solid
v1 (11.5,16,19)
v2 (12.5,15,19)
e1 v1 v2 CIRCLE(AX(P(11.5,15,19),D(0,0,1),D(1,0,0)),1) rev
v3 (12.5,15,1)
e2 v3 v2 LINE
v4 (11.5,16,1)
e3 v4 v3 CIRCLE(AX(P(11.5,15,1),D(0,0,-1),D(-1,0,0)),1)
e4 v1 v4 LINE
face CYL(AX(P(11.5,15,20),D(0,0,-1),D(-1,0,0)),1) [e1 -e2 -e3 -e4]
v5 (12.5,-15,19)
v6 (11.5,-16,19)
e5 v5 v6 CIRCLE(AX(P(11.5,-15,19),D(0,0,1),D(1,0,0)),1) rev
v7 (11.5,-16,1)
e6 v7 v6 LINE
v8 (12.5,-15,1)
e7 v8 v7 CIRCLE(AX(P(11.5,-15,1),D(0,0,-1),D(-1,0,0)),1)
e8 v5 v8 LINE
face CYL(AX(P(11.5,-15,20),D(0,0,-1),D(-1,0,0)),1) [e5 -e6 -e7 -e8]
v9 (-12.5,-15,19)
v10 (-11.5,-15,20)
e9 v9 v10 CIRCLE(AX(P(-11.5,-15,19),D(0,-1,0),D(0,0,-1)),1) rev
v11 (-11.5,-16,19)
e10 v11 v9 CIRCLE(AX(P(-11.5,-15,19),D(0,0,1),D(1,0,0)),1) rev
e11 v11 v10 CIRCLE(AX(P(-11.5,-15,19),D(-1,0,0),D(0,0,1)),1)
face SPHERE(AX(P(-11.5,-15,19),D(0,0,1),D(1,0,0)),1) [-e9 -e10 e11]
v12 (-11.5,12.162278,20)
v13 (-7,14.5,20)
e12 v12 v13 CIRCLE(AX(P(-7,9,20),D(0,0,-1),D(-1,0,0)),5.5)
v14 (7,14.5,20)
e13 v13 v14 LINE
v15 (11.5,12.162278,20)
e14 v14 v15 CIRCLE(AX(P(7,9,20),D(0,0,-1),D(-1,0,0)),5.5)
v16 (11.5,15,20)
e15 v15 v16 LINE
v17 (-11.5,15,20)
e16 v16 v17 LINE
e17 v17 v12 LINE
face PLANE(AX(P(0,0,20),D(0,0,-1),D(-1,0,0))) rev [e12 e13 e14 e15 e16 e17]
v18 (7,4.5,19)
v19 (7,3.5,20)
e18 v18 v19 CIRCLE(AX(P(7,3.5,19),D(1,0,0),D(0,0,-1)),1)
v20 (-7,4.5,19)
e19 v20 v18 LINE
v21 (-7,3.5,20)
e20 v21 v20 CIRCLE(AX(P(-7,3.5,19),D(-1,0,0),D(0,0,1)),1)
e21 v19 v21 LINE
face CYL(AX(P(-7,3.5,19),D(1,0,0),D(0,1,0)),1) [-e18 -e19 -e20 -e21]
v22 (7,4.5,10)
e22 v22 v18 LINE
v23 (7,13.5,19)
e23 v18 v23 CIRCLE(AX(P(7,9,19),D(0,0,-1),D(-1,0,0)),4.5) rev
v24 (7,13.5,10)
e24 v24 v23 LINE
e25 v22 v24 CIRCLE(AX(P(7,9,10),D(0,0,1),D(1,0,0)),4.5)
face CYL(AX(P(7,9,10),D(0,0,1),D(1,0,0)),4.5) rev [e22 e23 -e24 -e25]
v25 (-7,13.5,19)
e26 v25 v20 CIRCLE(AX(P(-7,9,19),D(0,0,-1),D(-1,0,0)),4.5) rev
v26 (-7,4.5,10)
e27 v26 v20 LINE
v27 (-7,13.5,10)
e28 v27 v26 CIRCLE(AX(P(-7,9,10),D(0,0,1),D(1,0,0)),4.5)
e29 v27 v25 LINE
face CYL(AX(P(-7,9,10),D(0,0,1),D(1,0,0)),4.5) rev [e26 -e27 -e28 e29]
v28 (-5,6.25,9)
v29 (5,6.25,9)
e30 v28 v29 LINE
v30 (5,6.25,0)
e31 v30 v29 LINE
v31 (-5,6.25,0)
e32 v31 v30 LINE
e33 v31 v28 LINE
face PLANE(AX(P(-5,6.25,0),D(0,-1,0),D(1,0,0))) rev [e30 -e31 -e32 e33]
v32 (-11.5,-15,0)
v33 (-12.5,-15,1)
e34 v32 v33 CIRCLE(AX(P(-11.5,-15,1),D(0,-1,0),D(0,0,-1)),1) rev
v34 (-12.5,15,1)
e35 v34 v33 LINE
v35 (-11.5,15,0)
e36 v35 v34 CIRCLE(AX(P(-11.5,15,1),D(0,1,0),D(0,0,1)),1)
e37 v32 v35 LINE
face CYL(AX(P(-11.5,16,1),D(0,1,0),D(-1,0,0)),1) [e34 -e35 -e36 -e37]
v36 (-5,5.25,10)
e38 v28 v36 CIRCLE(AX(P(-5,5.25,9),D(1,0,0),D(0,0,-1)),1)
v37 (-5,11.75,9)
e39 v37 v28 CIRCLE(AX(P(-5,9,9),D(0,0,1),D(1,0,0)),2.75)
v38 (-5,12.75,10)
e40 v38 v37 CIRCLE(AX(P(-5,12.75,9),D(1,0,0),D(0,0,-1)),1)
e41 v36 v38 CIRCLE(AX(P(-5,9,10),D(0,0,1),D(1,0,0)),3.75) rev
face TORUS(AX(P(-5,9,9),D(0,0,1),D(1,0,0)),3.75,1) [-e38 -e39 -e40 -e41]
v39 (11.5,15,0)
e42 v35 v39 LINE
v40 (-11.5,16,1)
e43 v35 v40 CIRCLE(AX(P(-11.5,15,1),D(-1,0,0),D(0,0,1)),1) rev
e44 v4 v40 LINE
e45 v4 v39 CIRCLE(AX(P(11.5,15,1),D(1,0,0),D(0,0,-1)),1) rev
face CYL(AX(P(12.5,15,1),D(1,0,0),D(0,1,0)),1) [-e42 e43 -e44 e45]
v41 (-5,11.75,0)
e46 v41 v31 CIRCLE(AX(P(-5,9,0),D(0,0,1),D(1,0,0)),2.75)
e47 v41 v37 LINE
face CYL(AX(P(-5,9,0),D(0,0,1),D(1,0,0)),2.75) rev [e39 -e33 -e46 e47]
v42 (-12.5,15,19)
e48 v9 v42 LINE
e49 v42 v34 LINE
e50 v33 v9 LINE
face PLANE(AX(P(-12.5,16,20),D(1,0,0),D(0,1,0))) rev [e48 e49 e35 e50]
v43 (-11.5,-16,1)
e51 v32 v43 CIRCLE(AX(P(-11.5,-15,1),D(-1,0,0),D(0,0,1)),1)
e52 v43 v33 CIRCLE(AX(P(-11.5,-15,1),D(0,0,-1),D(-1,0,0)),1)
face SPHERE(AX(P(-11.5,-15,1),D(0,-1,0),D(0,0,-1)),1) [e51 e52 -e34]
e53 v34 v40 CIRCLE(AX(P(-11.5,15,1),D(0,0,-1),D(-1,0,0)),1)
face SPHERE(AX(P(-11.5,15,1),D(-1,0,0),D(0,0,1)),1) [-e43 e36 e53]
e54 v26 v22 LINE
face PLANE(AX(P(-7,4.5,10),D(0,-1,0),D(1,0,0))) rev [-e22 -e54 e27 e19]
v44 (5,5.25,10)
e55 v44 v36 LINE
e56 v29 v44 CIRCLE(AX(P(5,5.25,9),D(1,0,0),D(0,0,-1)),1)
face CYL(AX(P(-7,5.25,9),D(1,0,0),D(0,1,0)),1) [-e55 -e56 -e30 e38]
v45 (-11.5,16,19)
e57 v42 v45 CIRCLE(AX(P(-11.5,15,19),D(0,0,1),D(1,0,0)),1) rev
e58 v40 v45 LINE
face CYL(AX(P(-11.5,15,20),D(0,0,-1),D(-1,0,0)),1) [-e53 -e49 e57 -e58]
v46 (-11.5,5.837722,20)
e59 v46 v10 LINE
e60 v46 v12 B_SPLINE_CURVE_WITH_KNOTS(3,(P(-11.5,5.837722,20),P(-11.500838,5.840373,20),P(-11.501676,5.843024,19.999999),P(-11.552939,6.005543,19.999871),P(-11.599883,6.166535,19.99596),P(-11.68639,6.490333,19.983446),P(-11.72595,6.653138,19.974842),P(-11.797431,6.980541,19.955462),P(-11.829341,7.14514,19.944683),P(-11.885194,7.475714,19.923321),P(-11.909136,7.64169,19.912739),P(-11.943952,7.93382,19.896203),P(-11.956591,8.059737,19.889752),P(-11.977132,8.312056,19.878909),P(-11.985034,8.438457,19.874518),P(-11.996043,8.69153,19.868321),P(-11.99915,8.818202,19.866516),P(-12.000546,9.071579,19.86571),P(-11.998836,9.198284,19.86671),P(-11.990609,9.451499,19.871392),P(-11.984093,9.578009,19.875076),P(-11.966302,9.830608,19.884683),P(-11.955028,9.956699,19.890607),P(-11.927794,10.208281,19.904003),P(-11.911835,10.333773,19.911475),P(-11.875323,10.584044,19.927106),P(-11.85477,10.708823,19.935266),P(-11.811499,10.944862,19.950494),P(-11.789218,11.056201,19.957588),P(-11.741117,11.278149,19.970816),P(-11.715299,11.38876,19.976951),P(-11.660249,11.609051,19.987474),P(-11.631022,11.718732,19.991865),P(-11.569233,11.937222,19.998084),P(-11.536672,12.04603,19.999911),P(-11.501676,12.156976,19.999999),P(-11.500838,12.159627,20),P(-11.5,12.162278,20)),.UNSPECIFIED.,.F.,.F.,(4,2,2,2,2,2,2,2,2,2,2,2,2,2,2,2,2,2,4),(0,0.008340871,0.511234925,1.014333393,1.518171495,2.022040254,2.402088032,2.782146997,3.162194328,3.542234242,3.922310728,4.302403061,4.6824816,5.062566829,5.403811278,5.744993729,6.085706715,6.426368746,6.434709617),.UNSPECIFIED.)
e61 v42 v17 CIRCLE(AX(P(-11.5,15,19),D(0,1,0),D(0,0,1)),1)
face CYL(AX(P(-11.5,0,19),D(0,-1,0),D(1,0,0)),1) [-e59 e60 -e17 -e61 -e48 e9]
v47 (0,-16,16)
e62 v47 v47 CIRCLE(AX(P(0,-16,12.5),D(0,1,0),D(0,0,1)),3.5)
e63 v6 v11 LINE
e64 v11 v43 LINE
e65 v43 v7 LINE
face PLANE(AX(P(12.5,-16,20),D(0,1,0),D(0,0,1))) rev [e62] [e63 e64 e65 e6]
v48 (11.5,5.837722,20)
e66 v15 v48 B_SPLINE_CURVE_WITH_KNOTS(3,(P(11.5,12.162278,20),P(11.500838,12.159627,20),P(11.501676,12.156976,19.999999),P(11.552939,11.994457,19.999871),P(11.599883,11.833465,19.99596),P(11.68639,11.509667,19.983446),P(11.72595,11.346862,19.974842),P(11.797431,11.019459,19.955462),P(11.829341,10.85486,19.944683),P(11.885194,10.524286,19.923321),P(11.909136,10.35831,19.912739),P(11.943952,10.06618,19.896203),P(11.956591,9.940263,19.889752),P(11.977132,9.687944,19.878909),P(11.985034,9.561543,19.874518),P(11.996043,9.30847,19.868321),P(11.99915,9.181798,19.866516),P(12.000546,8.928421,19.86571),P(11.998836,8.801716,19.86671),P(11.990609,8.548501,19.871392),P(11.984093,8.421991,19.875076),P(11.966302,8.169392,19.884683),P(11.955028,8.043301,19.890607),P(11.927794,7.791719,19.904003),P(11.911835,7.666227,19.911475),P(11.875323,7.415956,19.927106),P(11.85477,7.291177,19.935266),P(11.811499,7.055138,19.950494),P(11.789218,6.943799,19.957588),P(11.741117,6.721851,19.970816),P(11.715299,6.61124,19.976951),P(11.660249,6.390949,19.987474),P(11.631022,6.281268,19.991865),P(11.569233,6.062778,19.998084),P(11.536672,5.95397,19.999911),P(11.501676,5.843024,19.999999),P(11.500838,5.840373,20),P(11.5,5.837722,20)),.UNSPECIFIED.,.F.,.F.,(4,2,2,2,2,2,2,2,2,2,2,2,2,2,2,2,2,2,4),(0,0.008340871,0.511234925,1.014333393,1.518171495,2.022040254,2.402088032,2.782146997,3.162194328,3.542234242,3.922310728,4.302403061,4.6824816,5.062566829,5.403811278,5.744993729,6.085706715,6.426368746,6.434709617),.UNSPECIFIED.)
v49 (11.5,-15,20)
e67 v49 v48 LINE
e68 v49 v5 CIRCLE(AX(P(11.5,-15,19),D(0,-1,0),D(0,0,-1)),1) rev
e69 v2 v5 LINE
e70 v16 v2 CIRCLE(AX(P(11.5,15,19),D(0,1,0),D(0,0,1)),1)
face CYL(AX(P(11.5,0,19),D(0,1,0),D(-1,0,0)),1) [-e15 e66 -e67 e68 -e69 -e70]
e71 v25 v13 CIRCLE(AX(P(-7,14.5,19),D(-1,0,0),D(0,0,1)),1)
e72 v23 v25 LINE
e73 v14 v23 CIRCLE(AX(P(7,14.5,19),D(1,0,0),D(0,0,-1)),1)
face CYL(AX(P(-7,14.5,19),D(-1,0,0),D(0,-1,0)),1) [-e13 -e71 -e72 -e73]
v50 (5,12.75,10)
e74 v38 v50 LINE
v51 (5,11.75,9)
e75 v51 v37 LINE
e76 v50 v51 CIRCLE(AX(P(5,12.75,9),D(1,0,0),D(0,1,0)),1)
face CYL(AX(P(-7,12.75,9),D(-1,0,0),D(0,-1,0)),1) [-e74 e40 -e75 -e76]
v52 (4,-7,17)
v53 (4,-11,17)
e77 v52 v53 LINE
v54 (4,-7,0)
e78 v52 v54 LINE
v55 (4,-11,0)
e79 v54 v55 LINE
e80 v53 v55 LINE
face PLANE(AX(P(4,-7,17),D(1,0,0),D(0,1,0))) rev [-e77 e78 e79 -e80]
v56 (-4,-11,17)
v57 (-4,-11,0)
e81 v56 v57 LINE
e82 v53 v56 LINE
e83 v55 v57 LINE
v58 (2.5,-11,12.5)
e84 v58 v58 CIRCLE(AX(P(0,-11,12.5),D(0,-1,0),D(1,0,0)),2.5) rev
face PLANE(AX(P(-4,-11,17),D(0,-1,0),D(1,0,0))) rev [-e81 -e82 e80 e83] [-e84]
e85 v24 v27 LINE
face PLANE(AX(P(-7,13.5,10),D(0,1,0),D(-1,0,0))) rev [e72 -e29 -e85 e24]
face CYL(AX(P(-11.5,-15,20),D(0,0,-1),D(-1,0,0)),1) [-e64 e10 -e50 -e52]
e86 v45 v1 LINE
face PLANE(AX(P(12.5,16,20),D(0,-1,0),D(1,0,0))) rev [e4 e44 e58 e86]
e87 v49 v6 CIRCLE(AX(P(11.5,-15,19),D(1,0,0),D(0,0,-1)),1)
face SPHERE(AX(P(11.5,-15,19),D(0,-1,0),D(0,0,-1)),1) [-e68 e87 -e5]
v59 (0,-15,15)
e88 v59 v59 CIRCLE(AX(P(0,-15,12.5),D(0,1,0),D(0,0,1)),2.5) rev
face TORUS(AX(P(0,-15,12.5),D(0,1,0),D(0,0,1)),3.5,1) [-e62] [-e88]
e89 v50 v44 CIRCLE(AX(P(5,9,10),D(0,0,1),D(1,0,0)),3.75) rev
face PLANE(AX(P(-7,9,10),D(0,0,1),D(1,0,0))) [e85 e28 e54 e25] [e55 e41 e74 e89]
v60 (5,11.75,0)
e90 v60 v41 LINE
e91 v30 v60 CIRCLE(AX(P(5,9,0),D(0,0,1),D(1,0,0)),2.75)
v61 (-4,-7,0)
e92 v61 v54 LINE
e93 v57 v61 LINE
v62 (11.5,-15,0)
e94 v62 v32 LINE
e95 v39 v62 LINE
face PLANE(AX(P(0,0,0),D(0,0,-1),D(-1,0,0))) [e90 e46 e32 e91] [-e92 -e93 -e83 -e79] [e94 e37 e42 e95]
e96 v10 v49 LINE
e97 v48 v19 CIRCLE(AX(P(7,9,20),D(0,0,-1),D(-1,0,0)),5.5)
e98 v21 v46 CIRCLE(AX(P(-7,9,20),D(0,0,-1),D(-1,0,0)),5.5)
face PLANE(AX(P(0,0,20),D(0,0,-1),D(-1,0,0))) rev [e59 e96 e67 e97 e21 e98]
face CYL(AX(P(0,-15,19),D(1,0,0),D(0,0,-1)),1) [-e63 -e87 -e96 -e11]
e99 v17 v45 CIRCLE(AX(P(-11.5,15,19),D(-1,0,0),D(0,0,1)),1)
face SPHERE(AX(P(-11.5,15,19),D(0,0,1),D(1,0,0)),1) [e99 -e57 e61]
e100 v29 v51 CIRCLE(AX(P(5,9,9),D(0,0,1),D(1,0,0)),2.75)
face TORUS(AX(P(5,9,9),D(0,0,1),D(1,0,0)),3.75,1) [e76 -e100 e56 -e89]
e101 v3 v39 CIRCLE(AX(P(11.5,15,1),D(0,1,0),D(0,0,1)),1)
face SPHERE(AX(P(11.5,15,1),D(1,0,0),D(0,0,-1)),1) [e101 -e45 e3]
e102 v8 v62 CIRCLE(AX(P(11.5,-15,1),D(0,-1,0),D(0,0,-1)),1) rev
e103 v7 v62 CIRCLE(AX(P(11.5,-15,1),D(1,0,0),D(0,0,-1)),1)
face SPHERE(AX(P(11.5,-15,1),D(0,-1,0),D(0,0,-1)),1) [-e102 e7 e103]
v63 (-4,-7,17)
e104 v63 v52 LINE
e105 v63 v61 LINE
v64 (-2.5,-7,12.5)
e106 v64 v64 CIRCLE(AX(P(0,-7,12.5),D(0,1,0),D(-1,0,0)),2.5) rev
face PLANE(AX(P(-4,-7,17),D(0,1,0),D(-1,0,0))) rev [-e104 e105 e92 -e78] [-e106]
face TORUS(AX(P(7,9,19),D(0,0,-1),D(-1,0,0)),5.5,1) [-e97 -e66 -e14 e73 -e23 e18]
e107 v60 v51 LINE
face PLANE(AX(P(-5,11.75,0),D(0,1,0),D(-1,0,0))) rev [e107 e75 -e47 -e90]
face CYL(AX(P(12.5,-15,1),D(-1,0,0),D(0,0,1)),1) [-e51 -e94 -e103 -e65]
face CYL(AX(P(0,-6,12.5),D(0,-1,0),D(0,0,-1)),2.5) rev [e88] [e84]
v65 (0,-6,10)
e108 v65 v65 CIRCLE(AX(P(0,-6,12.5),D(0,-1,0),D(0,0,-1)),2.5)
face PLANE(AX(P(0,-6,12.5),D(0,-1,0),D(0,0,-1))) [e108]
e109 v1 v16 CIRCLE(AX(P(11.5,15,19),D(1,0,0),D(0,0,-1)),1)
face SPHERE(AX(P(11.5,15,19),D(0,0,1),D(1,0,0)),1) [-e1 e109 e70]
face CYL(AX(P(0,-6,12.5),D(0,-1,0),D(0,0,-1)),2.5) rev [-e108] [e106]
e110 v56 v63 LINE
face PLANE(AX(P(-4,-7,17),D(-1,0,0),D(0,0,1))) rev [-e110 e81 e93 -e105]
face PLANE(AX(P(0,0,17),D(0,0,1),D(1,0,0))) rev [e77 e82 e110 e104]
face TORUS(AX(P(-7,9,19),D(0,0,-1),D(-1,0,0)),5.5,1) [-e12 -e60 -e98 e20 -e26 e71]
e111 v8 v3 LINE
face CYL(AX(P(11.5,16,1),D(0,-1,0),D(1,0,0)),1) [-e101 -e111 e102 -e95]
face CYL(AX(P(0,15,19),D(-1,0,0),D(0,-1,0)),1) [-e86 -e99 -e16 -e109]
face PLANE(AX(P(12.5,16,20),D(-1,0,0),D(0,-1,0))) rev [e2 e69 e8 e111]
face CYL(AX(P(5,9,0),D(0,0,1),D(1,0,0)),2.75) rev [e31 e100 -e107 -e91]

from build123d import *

# Parameters (mm, degrees)
CROQUIS1_W              = 25
CROQUIS1_H              = 32
SALIENTE_EXTRUIR1_DEPTH = 20
CORTAR_EXTRUIR2_DEPTH   = 20
CORTAR_EXTRUIR3_DEPTH   = 10
CROQUIS9_R              = 2.5
CORTAR_EXTRUIR4_DEPTH   = 10
CROQUIS10_W             = 8
CROQUIS10_H             = 4
CORTAR_EXTRUIR5_DEPTH   = 17
REDONDEO1_R             = 1


with BuildPart() as part:
    # Croquis1 → Saliente-Extruir1 (new body)
    with BuildSketch(Plane.XY):
        Rectangle(CROQUIS1_W, CROQUIS1_H)
    extrude(amount=SALIENTE_EXTRUIR1_DEPTH)

    # Croquis7 → Cortar-Extruir2 (cut)
    with BuildSketch(Plane.XY.offset(20)):
        with BuildLine():
            Line((-5, 11.75), (5, 11.75))
            ThreePointArc((5, 11.75), (7.75, 9), (5, 6.25))
            Line((5, 6.25), (-5, 6.25))
            ThreePointArc((-5, 6.25), (-7.75, 9), (-5, 11.75))
        make_face()
    extrude(amount=-CORTAR_EXTRUIR2_DEPTH, mode=Mode.SUBTRACT)

    # Croquis8 → Cortar-Extruir3 (cut)
    with BuildSketch(Plane.XY.offset(20)):
        with BuildLine():
            Line((-7, 13.5), (7, 13.5))
            ThreePointArc((7, 13.5), (11.5, 9), (7, 4.5))
            Line((7, 4.5), (-7, 4.5))
            ThreePointArc((-7, 4.5), (-11.5, 9), (-7, 13.5))
        make_face()
    extrude(amount=-CORTAR_EXTRUIR3_DEPTH, mode=Mode.SUBTRACT)

    # Croquis9 → Cortar-Extruir4 (cut)
    with BuildSketch(Plane.XZ.offset(16)):
        with Locations(Location((0, 12.5, 0), (0, 0, 270))):
            Circle(CROQUIS9_R)
    extrude(amount=-CORTAR_EXTRUIR4_DEPTH, mode=Mode.SUBTRACT)

    # Croquis10 → Cortar-Extruir5 (cut)
    with BuildSketch(Plane(origin=(0, 0, 0), x_dir=(-1, 0, 0), z_dir=(0, 0, -1))):
        with Locations((0, -9)):
            Rectangle(CROQUIS10_W, CROQUIS10_H)
    extrude(amount=-CORTAR_EXTRUIR5_DEPTH, mode=Mode.SUBTRACT)

    # Redondeo1
    # the kernel refuses this fillet: 1 mm, written as the material it takes off along each edge
    with BuildSketch(Plane(origin=(11.5, -15, 19), x_dir=(0, 0, 1), z_dir=(1, 0, 0))) as redondeo1_piece_1_section:
        Polygon((0, 0), (REDONDEO1_R, 0), (REDONDEO1_R, REDONDEO1_R), (0, REDONDEO1_R), align=None)
    redondeo1_piece_1 = extrude(amount=REDONDEO1_R, mode=Mode.PRIVATE)
    redondeo1_piece_1 = redondeo1_piece_1 - Plane(origin=(11.5, -15, 19), x_dir=(0, 0.7071067811865475, -0.7071067811865475), z_dir=(1, 0, 0)) * Sphere(REDONDEO1_R, mode=Mode.PRIVATE)
    add(redondeo1_piece_1, mode=Mode.SUBTRACT)
    with BuildSketch(Plane(origin=(11.5, 15, 19), x_dir=(1, 0, 0), z_dir=(0, 1, 0))) as redondeo1_piece_2_section:
        Polygon((0, 0), (REDONDEO1_R, 0), (REDONDEO1_R, -REDONDEO1_R), (0, -REDONDEO1_R), align=None)
    redondeo1_piece_2 = extrude(amount=REDONDEO1_R, mode=Mode.PRIVATE)
    redondeo1_piece_2 = redondeo1_piece_2 - Plane(origin=(11.5, 15, 19), x_dir=(-0.7071067811865475, 0, -0.7071067811865475), z_dir=(0, 1, 0)) * Sphere(REDONDEO1_R, mode=Mode.PRIVATE)
    add(redondeo1_piece_2, mode=Mode.SUBTRACT)
    with BuildSketch(Plane(origin=(-11.5, 15, 19), x_dir=(-1, 0, 0), z_dir=(0, 1, 0))) as redondeo1_piece_3_section:
        Polygon((0, 0), (REDONDEO1_R, 0), (REDONDEO1_R, REDONDEO1_R), (0, REDONDEO1_R), align=None)
    redondeo1_piece_3 = extrude(amount=REDONDEO1_R, mode=Mode.PRIVATE)
    redondeo1_piece_3 = redondeo1_piece_3 - Plane(origin=(-11.5, 15, 19), x_dir=(0.7071067811865475, 0, -0.7071067811865475), z_dir=(0, 1, 0)) * Sphere(REDONDEO1_R, mode=Mode.PRIVATE)
    add(redondeo1_piece_3, mode=Mode.SUBTRACT)
    with BuildSketch(Plane(origin=(-11.5, -15, 19), x_dir=(0, 0, 1), z_dir=(-1, 0, 0))) as redondeo1_piece_4_section:
        Polygon((0, 0), (REDONDEO1_R, 0), (REDONDEO1_R, -REDONDEO1_R), (0, -REDONDEO1_R), align=None)
    redondeo1_piece_4 = extrude(amount=REDONDEO1_R, mode=Mode.PRIVATE)
    redondeo1_piece_4 = redondeo1_piece_4 - Plane(origin=(-11.5, -15, 19), x_dir=(0, 0.7071067811865475, -0.7071067811865475), z_dir=(-1, 0, 0)) * Sphere(REDONDEO1_R, mode=Mode.PRIVATE)
    add(redondeo1_piece_4, mode=Mode.SUBTRACT)
    with BuildSketch(Plane(origin=(11.5, 15, 1), x_dir=(1, 0, 0), z_dir=(0, 1, 0))) as redondeo1_piece_5_section:
        Polygon((0, 0), (REDONDEO1_R, 0), (REDONDEO1_R, REDONDEO1_R), (0, REDONDEO1_R), align=None)
    redondeo1_piece_5 = extrude(amount=REDONDEO1_R, mode=Mode.PRIVATE)
    redondeo1_piece_5 = redondeo1_piece_5 - Plane(origin=(11.5, 15, 1), x_dir=(-0.7071067811865475, 0, 0.7071067811865475), z_dir=(0, 1, 0)) * Sphere(REDONDEO1_R, mode=Mode.PRIVATE)
    add(redondeo1_piece_5, mode=Mode.SUBTRACT)
    with BuildSketch(Plane(origin=(-11.5, 15, 1), x_dir=(-1, 0, 0), z_dir=(0, 1, 0))) as redondeo1_piece_6_section:
        Polygon((0, 0), (REDONDEO1_R, 0), (REDONDEO1_R, -REDONDEO1_R), (0, -REDONDEO1_R), align=None)
    redondeo1_piece_6 = extrude(amount=REDONDEO1_R, mode=Mode.PRIVATE)
    redondeo1_piece_6 = redondeo1_piece_6 - Plane(origin=(-11.5, 15, 1), x_dir=(0.7071067811865475, 0, 0.7071067811865475), z_dir=(0, 1, 0)) * Sphere(REDONDEO1_R, mode=Mode.PRIVATE)
    add(redondeo1_piece_6, mode=Mode.SUBTRACT)
    with BuildSketch(Plane(origin=(11.5, -15, 1), x_dir=(0, 0, -1), z_dir=(1, 0, 0))) as redondeo1_piece_7_section:
        Polygon((0, 0), (REDONDEO1_R, 0), (REDONDEO1_R, -REDONDEO1_R), (0, -REDONDEO1_R), align=None)
    redondeo1_piece_7 = extrude(amount=REDONDEO1_R, mode=Mode.PRIVATE)
    redondeo1_piece_7 = redondeo1_piece_7 - Plane(origin=(11.5, -15, 1), x_dir=(0, 0.7071067811865475, 0.7071067811865475), z_dir=(1, 0, 0)) * Sphere(REDONDEO1_R, mode=Mode.PRIVATE)
    add(redondeo1_piece_7, mode=Mode.SUBTRACT)
    with BuildSketch(Plane(origin=(-11.5, -15, 1), x_dir=(0, 0, -1), z_dir=(-1, 0, 0))) as redondeo1_piece_8_section:
        Polygon((0, 0), (REDONDEO1_R, 0), (REDONDEO1_R, REDONDEO1_R), (0, REDONDEO1_R), align=None)
    redondeo1_piece_8 = extrude(amount=REDONDEO1_R, mode=Mode.PRIVATE)
    redondeo1_piece_8 = redondeo1_piece_8 - Plane(origin=(-11.5, -15, 1), x_dir=(0, 0.7071067811865475, 0.7071067811865475), z_dir=(-1, 0, 0)) * Sphere(REDONDEO1_R, mode=Mode.PRIVATE)
    add(redondeo1_piece_8, mode=Mode.SUBTRACT)
    with BuildSketch(Plane(origin=(12.5, -15, 20), x_dir=(0, 0, -1), z_dir=(0, 1, 0)), Plane(origin=(-12.5, 15, 20), x_dir=(0, 0, -1), z_dir=(0, -1, 0))) as redondeo1_piece_9:
        with BuildLine():
            CenterArc((REDONDEO1_R, REDONDEO1_R), REDONDEO1_R, 180, 90)
            Line((0, REDONDEO1_R), (0, 0))
            Line((0, 0), (REDONDEO1_R, 0))
        make_face()
    extrude(amount=30, mode=Mode.SUBTRACT)
    with BuildSketch(Plane(origin=(11.5, 16, 20), x_dir=(0, 0, -1), z_dir=(-1, 0, 0)), Plane(origin=(-11.5, -16, 0), x_dir=(0, 1, 0), z_dir=(1, 0, 0))) as redondeo1_piece_10:
        with BuildLine():
            CenterArc((REDONDEO1_R, REDONDEO1_R), REDONDEO1_R, 180, 90)
            Line((0, REDONDEO1_R), (0, 0))
            Line((0, 0), (REDONDEO1_R, 0))
        make_face()
    extrude(amount=23, mode=Mode.SUBTRACT)
    with BuildSketch(Plane(origin=(5, 6.25, 10), x_dir=(0, 0, -1), z_dir=(-1, 0, 0)), Plane(origin=(-5, 11.75, 10), x_dir=(0, 0, -1), z_dir=(1, 0, 0))) as redondeo1_piece_11:
        with BuildLine():
            CenterArc((REDONDEO1_R, REDONDEO1_R), REDONDEO1_R, 180, 90)
            Line((0, REDONDEO1_R), (0, 0))
            Line((0, 0), (REDONDEO1_R, 0))
        make_face()
    extrude(amount=10, mode=Mode.SUBTRACT)
    with BuildSketch(Plane(origin=(-7, 9, 20), x_dir=(0, -1, 0), z_dir=(1, 0, 0))) as redondeo1_piece_12:
        with BuildLine():
            CenterArc((4.5 + REDONDEO1_R, REDONDEO1_R), REDONDEO1_R, 180, 90)
            Line((4.5, REDONDEO1_R), (4.5, 0))
            Line((4.5, 0), (4.5 + REDONDEO1_R, 0))
        make_face()
    revolve(axis=Axis((-7, 9, 20), (0, 0, -1)), revolution_arc=180, mode=Mode.SUBTRACT)
    with BuildSketch(Plane(origin=(7, 4.5, 20), x_dir=(0, -1, 0), z_dir=(-1, 0, 0)), Plane(origin=(-7, 13.5, 20), x_dir=(0, 1, 0), z_dir=(1, 0, 0))) as redondeo1_piece_13:
        with BuildLine():
            CenterArc((REDONDEO1_R, -REDONDEO1_R), REDONDEO1_R, 90, 90)
            Line((0, -REDONDEO1_R), (0, 0))
            Line((0, 0), (REDONDEO1_R, 0))
        make_face()
    extrude(amount=14, mode=Mode.SUBTRACT)
    with BuildSketch(Plane(origin=(7, 9, 20), x_dir=(0, 1, 0), z_dir=(-1, 0, 0))) as redondeo1_piece_14:
        with BuildLine():
            CenterArc((4.5 + REDONDEO1_R, REDONDEO1_R), REDONDEO1_R, 180, 90)
            Line((4.5, REDONDEO1_R), (4.5, 0))
            Line((4.5, 0), (4.5 + REDONDEO1_R, 0))
        make_face()
    revolve(axis=Axis((7, 9, 20), (0, 0, -1)), revolution_arc=180, mode=Mode.SUBTRACT)
    with BuildSketch(Plane(origin=(-5, 9, 10), x_dir=(0, 1, 0), z_dir=(1, 0, 0))) as redondeo1_piece_15:
        with BuildLine():
            CenterArc((2.75 + REDONDEO1_R, -REDONDEO1_R), REDONDEO1_R, 90, 90)
            Line((2.75 + REDONDEO1_R, 0), (2.75, 0))
            Line((2.75, 0), (2.75, -REDONDEO1_R))
        make_face()
    revolve(axis=Axis((-5, 9, 10), (0, 0, 1)), revolution_arc=180, mode=Mode.SUBTRACT)
    with BuildSketch(Plane(origin=(5, 9, 10), x_dir=(0, -1, 0), z_dir=(-1, 0, 0))) as redondeo1_piece_16:
        with BuildLine():
            CenterArc((2.75 + REDONDEO1_R, -REDONDEO1_R), REDONDEO1_R, 90, 90)
            Line((2.75 + REDONDEO1_R, 0), (2.75, 0))
            Line((2.75, 0), (2.75, -REDONDEO1_R))
        make_face()
    revolve(axis=Axis((5, 9, 10), (0, 0, 1)), revolution_arc=180, mode=Mode.SUBTRACT)
    with BuildSketch(Plane(origin=(11.5, 16, 0), x_dir=(0, 0, 1), z_dir=(-1, 0, 0)), Plane(origin=(-11.5, -16, 20), x_dir=(0, 1, 0), z_dir=(1, 0, 0))) as redondeo1_piece_17:
        with BuildLine():
            CenterArc((REDONDEO1_R, -REDONDEO1_R), REDONDEO1_R, 90, 90)
            Line((0, -REDONDEO1_R), (0, 0))
            Line((0, 0), (REDONDEO1_R, 0))
        make_face()
    extrude(amount=23, mode=Mode.SUBTRACT)
    with BuildSketch(Plane(origin=(0, -16, 12.5), x_dir=(0, 0, -1), z_dir=(-1, 0, 0))) as redondeo1_piece_18:
        with BuildLine():
            CenterArc((2.5 + REDONDEO1_R, -REDONDEO1_R), REDONDEO1_R, 90, 90)
            Line((2.5, -REDONDEO1_R), (2.5, 0))
            Line((2.5, 0), (2.5 + REDONDEO1_R, 0))
        make_face()
    revolve(axis=Axis((0, -16, 12.5), (0, -1, 0)), mode=Mode.SUBTRACT)
    with BuildSketch(Plane(origin=(12.5, -15, 0), x_dir=(0, 0, 1), z_dir=(0, 1, 0)), Plane(origin=(-12.5, 15, 0), x_dir=(0, 0, 1), z_dir=(0, -1, 0))) as redondeo1_piece_19:
        with BuildLine():
            CenterArc((REDONDEO1_R, -REDONDEO1_R), REDONDEO1_R, 90, 90)
            Line((0, -REDONDEO1_R), (0, 0))
            Line((0, 0), (REDONDEO1_R, 0))
        make_face()
    extrude(amount=30, mode=Mode.SUBTRACT)
    with BuildSketch(Plane(origin=(-12.5, 16, 1), x_dir=(1, 0, 0), z_dir=(0, 0, 1)), Plane(origin=(-12.5, -16, 1), x_dir=(0, 1, 0), z_dir=(0, 0, 1))) as redondeo1_piece_20:
        with BuildLine():
            CenterArc((REDONDEO1_R, -REDONDEO1_R), REDONDEO1_R, 90, 90)
            Line((0, -REDONDEO1_R), (0, 0))
            Line((0, 0), (REDONDEO1_R, 0))
        make_face()
    extrude(amount=18, mode=Mode.SUBTRACT)
    with BuildSketch(Plane(origin=(12.5, 16, 1), x_dir=(-1, 0, 0), z_dir=(0, 0, 1)), Plane(origin=(12.5, -16, 1), x_dir=(0, 1, 0), z_dir=(0, 0, 1))) as redondeo1_piece_21:
        with BuildLine():
            CenterArc((REDONDEO1_R, REDONDEO1_R), REDONDEO1_R, 180, 90)
            Line((0, REDONDEO1_R), (0, 0))
            Line((0, 0), (REDONDEO1_R, 0))
        make_face()
    extrude(amount=18, mode=Mode.SUBTRACT)


solid = part.part
